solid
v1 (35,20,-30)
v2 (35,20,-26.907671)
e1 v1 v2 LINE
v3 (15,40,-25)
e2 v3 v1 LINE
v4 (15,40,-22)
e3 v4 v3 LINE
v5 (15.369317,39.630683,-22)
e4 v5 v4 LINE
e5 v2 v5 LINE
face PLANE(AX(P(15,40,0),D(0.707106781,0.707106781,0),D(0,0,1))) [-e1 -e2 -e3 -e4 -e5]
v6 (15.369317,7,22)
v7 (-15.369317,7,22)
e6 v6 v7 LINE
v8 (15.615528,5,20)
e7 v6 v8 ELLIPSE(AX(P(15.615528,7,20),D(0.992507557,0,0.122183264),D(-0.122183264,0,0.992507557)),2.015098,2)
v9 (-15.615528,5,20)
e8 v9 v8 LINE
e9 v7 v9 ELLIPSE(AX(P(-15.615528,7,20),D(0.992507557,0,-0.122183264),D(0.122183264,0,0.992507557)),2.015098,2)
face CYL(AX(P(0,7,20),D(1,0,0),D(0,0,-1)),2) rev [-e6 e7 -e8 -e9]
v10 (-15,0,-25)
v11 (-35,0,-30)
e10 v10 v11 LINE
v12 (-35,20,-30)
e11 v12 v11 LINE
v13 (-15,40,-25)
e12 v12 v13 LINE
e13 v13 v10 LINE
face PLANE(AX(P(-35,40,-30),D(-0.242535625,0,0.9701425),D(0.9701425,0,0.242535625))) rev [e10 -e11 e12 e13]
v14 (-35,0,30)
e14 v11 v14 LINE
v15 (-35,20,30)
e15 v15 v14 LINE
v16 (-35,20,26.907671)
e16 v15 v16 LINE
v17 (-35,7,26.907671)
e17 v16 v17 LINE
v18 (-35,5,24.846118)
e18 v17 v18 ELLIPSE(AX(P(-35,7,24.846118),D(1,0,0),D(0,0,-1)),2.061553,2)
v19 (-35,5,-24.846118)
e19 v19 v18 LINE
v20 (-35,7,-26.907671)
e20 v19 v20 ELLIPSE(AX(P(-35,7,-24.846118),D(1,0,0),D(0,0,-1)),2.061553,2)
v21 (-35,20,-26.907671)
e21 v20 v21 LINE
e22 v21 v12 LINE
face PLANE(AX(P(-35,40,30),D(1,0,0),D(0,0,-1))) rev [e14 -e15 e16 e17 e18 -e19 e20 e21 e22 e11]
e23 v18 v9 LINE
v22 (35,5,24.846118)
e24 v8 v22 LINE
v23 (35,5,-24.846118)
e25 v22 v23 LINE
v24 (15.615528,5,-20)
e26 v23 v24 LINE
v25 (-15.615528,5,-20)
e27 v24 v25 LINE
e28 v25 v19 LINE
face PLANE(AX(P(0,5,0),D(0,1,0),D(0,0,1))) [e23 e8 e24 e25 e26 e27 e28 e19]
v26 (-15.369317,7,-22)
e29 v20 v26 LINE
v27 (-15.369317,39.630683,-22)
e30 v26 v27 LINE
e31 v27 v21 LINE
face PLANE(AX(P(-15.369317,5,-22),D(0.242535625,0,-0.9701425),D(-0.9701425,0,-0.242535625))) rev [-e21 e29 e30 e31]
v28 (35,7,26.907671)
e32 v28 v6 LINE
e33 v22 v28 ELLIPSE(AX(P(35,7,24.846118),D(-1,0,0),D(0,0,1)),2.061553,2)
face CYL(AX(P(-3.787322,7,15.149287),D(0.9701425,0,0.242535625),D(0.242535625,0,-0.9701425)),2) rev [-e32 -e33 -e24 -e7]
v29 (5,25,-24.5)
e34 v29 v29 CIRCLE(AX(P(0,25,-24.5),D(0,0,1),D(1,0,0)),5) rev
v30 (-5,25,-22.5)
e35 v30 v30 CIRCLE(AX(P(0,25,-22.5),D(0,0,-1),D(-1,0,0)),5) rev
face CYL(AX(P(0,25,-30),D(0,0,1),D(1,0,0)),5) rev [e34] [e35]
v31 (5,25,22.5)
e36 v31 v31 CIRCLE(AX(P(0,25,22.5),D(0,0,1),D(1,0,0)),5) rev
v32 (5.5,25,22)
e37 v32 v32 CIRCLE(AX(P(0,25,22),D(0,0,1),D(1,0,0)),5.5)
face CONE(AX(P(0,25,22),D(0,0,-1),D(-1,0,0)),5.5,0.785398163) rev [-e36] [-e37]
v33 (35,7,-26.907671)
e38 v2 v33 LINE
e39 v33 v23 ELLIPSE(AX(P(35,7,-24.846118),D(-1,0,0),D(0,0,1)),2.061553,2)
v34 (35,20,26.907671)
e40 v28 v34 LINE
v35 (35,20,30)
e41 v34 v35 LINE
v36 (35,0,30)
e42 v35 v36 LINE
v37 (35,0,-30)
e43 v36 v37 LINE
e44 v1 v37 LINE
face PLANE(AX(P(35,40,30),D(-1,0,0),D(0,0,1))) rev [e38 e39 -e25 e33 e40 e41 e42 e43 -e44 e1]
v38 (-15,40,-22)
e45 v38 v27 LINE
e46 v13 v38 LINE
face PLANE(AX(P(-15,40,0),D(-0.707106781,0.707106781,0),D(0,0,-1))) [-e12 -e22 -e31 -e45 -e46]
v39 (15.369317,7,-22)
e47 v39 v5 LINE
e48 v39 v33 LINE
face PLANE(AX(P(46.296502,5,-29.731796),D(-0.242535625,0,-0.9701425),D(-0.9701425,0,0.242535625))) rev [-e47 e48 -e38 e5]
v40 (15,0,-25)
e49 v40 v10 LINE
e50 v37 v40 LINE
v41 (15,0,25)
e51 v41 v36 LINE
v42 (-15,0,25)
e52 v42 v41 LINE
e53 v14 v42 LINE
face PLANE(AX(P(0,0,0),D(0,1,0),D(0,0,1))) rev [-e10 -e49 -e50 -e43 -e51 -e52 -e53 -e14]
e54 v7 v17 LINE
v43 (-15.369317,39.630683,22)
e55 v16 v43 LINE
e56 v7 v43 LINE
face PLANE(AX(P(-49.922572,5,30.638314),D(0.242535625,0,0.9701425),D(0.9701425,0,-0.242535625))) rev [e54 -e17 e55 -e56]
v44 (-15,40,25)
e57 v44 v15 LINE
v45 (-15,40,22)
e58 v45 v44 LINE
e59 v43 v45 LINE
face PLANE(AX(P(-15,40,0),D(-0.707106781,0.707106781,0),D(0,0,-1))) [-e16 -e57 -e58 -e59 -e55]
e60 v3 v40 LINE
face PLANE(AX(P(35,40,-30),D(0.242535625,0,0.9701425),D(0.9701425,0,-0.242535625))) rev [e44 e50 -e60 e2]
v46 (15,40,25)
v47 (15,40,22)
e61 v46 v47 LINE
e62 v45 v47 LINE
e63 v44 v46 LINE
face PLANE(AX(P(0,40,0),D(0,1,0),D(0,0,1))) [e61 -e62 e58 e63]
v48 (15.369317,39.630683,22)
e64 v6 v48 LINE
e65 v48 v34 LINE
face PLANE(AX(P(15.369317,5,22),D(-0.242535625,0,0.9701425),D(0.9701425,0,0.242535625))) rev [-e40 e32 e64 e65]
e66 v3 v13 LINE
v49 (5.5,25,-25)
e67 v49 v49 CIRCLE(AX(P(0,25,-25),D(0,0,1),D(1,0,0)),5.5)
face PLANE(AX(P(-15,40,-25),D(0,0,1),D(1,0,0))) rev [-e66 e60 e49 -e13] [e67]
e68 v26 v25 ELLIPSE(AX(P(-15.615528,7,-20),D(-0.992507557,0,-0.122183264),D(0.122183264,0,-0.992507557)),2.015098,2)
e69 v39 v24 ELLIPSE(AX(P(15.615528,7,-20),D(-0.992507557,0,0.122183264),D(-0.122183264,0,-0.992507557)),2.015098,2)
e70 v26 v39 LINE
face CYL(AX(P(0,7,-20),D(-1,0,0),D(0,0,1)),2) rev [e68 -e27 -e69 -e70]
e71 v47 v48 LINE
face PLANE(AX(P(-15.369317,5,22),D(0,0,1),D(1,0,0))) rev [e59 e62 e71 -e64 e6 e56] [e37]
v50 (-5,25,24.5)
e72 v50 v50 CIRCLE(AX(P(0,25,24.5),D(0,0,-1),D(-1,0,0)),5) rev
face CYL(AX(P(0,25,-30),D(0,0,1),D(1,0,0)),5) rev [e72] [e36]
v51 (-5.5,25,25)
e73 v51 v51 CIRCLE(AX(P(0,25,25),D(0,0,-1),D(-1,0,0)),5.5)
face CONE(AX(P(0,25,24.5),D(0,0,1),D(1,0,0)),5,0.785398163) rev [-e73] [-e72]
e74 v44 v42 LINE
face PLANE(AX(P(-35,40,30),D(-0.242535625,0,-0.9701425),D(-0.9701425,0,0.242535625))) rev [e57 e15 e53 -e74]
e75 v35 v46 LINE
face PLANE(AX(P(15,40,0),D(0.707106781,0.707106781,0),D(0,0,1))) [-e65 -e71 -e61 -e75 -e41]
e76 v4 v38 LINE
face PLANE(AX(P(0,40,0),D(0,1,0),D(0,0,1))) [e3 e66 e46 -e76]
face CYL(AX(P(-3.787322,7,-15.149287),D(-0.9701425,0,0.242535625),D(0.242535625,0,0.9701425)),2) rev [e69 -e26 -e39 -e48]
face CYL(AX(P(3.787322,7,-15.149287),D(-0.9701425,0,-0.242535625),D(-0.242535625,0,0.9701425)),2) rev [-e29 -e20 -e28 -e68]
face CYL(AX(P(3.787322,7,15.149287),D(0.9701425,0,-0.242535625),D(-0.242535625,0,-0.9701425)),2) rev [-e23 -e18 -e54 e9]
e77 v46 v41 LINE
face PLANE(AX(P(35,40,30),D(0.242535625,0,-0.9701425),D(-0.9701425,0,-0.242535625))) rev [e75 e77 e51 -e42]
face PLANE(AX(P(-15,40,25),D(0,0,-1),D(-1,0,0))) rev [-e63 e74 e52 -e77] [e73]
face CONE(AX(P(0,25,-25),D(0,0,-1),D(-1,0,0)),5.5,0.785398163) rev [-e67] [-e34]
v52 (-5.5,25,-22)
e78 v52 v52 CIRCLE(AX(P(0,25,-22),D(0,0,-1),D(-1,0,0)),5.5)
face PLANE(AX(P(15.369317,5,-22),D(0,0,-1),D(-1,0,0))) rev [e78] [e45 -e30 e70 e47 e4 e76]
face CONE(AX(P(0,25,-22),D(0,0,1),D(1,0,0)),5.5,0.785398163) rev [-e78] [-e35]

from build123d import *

# Parameters (mm, degrees)
BOSS_EXTRUDE1_DEPTH = 40
CUT_EXTRUDE1_DEPTH  = 35
CHAMFER1_SIZE       = 20
SKETCH4_R           = 5
CUT_EXTRUDE2_DEPTH  = 77.485292704
FILLET1_R           = 2
CHAMFER2_SIZE       = 0.5


with BuildPart() as part:
    # Sketch1 → Boss-Extrude1 (new body)
    with BuildSketch(Plane(origin=(0, 0, 0), x_dir=(1, 0, 0), z_dir=(0, 1, 0))):
        Polygon((-35, -30), (-35, 30), (-15, 25), (15, 25), (35, 30), (35, -30), (15, -25), (-15, -25), align=None)
    extrude(amount=BOSS_EXTRUDE1_DEPTH)

    # Sketch2 → Cut-Extrude1 (cut)
    with BuildSketch(Plane(origin=(0, 40, 0), x_dir=(1, 0, 0), z_dir=(0, 1, 0))):
        Polygon((-15.369316877, 22), (-49.922572363, 30.638313872), (-49.922572363, -30.638313872), (-15.369316877, -22), (15.369316877, -22), (46.296501907, -29.731796258), (46.296501907, 29.731796258), (15.369316877, 22), align=None)
    extrude(amount=-CUT_EXTRUDE1_DEPTH, mode=Mode.SUBTRACT)

    # Chamfer1
    # the kernel refuses this chamfer: 20 mm, written as the material it takes off along each edge
    with BuildSketch(Plane(origin=(35, 40, -24.525988979), x_dir=(-0.9996219169112968, 0.027495876610586317, 0), z_dir=(0, 0, 1)), Plane(origin=(35, 40, -81.433659759), x_dir=(-0.9996219169112968, 0.027495876610586317, 0), z_dir=(0, 0, 1))) as chamfer1_piece_1:
        Polygon((CHAMFER1_SIZE * 0.999621916911, CHAMFER1_SIZE * 0.0274958766106), (-CHAMFER1_SIZE * 0.0274958766106, CHAMFER1_SIZE * 0.999621916911), (0, 0), align=None)
    extrude(amount=105.959648738, mode=Mode.SUBTRACT)
    with BuildSketch(Plane(origin=(-35, 40, 24.525988979), x_dir=(-0.027495876610586317, -0.9996219169112968, 0), z_dir=(0, 0, -1)), Plane(origin=(-35, 40, 81.433659759), x_dir=(-0.027495876610586317, -0.9996219169112968, 0), z_dir=(0, 0, -1))) as chamfer1_piece_2:
        Polygon((CHAMFER1_SIZE * 0.999621916911, -CHAMFER1_SIZE * 0.0274958766106), (-CHAMFER1_SIZE * 0.0274958766106, -CHAMFER1_SIZE * 0.999621916911), (0, 0), align=None)
    extrude(amount=105.959648738, mode=Mode.SUBTRACT)

    # Sketch4 → Cut-Extrude2 (cut, through all)
    with BuildSketch(Plane.XY.offset(25)):
        with Locations((0, 25)):
            Circle(SKETCH4_R)
    extrude(amount=-CUT_EXTRUDE2_DEPTH, mode=Mode.SUBTRACT)

    # Fillet1
    fillet1_edges = [part.edges().sort_by_distance(p)[0] for p in [
        (25.184658438, 5, -24.45383539),
        (25.184658438, 5, 24.45383539),
        (-25.184658438, 5, 24.45383539),
        (-25.184658438, 5, -24.45383539),
        (0, 5, -22),
        (0, 5, 22),
    ]]
    fillet(fillet1_edges, radius=FILLET1_R)

    # Chamfer2
    chamfer2_edges = [part.edges().sort_by_distance(p)[0] for p in [
        (-5, 25, -22),
        (-5, 25, -25),
        (-5, 25, 22),
        (-5, 25, 25),
    ]]
    chamfer(chamfer2_edges, length=CHAMFER2_SIZE)


solid = part.part
